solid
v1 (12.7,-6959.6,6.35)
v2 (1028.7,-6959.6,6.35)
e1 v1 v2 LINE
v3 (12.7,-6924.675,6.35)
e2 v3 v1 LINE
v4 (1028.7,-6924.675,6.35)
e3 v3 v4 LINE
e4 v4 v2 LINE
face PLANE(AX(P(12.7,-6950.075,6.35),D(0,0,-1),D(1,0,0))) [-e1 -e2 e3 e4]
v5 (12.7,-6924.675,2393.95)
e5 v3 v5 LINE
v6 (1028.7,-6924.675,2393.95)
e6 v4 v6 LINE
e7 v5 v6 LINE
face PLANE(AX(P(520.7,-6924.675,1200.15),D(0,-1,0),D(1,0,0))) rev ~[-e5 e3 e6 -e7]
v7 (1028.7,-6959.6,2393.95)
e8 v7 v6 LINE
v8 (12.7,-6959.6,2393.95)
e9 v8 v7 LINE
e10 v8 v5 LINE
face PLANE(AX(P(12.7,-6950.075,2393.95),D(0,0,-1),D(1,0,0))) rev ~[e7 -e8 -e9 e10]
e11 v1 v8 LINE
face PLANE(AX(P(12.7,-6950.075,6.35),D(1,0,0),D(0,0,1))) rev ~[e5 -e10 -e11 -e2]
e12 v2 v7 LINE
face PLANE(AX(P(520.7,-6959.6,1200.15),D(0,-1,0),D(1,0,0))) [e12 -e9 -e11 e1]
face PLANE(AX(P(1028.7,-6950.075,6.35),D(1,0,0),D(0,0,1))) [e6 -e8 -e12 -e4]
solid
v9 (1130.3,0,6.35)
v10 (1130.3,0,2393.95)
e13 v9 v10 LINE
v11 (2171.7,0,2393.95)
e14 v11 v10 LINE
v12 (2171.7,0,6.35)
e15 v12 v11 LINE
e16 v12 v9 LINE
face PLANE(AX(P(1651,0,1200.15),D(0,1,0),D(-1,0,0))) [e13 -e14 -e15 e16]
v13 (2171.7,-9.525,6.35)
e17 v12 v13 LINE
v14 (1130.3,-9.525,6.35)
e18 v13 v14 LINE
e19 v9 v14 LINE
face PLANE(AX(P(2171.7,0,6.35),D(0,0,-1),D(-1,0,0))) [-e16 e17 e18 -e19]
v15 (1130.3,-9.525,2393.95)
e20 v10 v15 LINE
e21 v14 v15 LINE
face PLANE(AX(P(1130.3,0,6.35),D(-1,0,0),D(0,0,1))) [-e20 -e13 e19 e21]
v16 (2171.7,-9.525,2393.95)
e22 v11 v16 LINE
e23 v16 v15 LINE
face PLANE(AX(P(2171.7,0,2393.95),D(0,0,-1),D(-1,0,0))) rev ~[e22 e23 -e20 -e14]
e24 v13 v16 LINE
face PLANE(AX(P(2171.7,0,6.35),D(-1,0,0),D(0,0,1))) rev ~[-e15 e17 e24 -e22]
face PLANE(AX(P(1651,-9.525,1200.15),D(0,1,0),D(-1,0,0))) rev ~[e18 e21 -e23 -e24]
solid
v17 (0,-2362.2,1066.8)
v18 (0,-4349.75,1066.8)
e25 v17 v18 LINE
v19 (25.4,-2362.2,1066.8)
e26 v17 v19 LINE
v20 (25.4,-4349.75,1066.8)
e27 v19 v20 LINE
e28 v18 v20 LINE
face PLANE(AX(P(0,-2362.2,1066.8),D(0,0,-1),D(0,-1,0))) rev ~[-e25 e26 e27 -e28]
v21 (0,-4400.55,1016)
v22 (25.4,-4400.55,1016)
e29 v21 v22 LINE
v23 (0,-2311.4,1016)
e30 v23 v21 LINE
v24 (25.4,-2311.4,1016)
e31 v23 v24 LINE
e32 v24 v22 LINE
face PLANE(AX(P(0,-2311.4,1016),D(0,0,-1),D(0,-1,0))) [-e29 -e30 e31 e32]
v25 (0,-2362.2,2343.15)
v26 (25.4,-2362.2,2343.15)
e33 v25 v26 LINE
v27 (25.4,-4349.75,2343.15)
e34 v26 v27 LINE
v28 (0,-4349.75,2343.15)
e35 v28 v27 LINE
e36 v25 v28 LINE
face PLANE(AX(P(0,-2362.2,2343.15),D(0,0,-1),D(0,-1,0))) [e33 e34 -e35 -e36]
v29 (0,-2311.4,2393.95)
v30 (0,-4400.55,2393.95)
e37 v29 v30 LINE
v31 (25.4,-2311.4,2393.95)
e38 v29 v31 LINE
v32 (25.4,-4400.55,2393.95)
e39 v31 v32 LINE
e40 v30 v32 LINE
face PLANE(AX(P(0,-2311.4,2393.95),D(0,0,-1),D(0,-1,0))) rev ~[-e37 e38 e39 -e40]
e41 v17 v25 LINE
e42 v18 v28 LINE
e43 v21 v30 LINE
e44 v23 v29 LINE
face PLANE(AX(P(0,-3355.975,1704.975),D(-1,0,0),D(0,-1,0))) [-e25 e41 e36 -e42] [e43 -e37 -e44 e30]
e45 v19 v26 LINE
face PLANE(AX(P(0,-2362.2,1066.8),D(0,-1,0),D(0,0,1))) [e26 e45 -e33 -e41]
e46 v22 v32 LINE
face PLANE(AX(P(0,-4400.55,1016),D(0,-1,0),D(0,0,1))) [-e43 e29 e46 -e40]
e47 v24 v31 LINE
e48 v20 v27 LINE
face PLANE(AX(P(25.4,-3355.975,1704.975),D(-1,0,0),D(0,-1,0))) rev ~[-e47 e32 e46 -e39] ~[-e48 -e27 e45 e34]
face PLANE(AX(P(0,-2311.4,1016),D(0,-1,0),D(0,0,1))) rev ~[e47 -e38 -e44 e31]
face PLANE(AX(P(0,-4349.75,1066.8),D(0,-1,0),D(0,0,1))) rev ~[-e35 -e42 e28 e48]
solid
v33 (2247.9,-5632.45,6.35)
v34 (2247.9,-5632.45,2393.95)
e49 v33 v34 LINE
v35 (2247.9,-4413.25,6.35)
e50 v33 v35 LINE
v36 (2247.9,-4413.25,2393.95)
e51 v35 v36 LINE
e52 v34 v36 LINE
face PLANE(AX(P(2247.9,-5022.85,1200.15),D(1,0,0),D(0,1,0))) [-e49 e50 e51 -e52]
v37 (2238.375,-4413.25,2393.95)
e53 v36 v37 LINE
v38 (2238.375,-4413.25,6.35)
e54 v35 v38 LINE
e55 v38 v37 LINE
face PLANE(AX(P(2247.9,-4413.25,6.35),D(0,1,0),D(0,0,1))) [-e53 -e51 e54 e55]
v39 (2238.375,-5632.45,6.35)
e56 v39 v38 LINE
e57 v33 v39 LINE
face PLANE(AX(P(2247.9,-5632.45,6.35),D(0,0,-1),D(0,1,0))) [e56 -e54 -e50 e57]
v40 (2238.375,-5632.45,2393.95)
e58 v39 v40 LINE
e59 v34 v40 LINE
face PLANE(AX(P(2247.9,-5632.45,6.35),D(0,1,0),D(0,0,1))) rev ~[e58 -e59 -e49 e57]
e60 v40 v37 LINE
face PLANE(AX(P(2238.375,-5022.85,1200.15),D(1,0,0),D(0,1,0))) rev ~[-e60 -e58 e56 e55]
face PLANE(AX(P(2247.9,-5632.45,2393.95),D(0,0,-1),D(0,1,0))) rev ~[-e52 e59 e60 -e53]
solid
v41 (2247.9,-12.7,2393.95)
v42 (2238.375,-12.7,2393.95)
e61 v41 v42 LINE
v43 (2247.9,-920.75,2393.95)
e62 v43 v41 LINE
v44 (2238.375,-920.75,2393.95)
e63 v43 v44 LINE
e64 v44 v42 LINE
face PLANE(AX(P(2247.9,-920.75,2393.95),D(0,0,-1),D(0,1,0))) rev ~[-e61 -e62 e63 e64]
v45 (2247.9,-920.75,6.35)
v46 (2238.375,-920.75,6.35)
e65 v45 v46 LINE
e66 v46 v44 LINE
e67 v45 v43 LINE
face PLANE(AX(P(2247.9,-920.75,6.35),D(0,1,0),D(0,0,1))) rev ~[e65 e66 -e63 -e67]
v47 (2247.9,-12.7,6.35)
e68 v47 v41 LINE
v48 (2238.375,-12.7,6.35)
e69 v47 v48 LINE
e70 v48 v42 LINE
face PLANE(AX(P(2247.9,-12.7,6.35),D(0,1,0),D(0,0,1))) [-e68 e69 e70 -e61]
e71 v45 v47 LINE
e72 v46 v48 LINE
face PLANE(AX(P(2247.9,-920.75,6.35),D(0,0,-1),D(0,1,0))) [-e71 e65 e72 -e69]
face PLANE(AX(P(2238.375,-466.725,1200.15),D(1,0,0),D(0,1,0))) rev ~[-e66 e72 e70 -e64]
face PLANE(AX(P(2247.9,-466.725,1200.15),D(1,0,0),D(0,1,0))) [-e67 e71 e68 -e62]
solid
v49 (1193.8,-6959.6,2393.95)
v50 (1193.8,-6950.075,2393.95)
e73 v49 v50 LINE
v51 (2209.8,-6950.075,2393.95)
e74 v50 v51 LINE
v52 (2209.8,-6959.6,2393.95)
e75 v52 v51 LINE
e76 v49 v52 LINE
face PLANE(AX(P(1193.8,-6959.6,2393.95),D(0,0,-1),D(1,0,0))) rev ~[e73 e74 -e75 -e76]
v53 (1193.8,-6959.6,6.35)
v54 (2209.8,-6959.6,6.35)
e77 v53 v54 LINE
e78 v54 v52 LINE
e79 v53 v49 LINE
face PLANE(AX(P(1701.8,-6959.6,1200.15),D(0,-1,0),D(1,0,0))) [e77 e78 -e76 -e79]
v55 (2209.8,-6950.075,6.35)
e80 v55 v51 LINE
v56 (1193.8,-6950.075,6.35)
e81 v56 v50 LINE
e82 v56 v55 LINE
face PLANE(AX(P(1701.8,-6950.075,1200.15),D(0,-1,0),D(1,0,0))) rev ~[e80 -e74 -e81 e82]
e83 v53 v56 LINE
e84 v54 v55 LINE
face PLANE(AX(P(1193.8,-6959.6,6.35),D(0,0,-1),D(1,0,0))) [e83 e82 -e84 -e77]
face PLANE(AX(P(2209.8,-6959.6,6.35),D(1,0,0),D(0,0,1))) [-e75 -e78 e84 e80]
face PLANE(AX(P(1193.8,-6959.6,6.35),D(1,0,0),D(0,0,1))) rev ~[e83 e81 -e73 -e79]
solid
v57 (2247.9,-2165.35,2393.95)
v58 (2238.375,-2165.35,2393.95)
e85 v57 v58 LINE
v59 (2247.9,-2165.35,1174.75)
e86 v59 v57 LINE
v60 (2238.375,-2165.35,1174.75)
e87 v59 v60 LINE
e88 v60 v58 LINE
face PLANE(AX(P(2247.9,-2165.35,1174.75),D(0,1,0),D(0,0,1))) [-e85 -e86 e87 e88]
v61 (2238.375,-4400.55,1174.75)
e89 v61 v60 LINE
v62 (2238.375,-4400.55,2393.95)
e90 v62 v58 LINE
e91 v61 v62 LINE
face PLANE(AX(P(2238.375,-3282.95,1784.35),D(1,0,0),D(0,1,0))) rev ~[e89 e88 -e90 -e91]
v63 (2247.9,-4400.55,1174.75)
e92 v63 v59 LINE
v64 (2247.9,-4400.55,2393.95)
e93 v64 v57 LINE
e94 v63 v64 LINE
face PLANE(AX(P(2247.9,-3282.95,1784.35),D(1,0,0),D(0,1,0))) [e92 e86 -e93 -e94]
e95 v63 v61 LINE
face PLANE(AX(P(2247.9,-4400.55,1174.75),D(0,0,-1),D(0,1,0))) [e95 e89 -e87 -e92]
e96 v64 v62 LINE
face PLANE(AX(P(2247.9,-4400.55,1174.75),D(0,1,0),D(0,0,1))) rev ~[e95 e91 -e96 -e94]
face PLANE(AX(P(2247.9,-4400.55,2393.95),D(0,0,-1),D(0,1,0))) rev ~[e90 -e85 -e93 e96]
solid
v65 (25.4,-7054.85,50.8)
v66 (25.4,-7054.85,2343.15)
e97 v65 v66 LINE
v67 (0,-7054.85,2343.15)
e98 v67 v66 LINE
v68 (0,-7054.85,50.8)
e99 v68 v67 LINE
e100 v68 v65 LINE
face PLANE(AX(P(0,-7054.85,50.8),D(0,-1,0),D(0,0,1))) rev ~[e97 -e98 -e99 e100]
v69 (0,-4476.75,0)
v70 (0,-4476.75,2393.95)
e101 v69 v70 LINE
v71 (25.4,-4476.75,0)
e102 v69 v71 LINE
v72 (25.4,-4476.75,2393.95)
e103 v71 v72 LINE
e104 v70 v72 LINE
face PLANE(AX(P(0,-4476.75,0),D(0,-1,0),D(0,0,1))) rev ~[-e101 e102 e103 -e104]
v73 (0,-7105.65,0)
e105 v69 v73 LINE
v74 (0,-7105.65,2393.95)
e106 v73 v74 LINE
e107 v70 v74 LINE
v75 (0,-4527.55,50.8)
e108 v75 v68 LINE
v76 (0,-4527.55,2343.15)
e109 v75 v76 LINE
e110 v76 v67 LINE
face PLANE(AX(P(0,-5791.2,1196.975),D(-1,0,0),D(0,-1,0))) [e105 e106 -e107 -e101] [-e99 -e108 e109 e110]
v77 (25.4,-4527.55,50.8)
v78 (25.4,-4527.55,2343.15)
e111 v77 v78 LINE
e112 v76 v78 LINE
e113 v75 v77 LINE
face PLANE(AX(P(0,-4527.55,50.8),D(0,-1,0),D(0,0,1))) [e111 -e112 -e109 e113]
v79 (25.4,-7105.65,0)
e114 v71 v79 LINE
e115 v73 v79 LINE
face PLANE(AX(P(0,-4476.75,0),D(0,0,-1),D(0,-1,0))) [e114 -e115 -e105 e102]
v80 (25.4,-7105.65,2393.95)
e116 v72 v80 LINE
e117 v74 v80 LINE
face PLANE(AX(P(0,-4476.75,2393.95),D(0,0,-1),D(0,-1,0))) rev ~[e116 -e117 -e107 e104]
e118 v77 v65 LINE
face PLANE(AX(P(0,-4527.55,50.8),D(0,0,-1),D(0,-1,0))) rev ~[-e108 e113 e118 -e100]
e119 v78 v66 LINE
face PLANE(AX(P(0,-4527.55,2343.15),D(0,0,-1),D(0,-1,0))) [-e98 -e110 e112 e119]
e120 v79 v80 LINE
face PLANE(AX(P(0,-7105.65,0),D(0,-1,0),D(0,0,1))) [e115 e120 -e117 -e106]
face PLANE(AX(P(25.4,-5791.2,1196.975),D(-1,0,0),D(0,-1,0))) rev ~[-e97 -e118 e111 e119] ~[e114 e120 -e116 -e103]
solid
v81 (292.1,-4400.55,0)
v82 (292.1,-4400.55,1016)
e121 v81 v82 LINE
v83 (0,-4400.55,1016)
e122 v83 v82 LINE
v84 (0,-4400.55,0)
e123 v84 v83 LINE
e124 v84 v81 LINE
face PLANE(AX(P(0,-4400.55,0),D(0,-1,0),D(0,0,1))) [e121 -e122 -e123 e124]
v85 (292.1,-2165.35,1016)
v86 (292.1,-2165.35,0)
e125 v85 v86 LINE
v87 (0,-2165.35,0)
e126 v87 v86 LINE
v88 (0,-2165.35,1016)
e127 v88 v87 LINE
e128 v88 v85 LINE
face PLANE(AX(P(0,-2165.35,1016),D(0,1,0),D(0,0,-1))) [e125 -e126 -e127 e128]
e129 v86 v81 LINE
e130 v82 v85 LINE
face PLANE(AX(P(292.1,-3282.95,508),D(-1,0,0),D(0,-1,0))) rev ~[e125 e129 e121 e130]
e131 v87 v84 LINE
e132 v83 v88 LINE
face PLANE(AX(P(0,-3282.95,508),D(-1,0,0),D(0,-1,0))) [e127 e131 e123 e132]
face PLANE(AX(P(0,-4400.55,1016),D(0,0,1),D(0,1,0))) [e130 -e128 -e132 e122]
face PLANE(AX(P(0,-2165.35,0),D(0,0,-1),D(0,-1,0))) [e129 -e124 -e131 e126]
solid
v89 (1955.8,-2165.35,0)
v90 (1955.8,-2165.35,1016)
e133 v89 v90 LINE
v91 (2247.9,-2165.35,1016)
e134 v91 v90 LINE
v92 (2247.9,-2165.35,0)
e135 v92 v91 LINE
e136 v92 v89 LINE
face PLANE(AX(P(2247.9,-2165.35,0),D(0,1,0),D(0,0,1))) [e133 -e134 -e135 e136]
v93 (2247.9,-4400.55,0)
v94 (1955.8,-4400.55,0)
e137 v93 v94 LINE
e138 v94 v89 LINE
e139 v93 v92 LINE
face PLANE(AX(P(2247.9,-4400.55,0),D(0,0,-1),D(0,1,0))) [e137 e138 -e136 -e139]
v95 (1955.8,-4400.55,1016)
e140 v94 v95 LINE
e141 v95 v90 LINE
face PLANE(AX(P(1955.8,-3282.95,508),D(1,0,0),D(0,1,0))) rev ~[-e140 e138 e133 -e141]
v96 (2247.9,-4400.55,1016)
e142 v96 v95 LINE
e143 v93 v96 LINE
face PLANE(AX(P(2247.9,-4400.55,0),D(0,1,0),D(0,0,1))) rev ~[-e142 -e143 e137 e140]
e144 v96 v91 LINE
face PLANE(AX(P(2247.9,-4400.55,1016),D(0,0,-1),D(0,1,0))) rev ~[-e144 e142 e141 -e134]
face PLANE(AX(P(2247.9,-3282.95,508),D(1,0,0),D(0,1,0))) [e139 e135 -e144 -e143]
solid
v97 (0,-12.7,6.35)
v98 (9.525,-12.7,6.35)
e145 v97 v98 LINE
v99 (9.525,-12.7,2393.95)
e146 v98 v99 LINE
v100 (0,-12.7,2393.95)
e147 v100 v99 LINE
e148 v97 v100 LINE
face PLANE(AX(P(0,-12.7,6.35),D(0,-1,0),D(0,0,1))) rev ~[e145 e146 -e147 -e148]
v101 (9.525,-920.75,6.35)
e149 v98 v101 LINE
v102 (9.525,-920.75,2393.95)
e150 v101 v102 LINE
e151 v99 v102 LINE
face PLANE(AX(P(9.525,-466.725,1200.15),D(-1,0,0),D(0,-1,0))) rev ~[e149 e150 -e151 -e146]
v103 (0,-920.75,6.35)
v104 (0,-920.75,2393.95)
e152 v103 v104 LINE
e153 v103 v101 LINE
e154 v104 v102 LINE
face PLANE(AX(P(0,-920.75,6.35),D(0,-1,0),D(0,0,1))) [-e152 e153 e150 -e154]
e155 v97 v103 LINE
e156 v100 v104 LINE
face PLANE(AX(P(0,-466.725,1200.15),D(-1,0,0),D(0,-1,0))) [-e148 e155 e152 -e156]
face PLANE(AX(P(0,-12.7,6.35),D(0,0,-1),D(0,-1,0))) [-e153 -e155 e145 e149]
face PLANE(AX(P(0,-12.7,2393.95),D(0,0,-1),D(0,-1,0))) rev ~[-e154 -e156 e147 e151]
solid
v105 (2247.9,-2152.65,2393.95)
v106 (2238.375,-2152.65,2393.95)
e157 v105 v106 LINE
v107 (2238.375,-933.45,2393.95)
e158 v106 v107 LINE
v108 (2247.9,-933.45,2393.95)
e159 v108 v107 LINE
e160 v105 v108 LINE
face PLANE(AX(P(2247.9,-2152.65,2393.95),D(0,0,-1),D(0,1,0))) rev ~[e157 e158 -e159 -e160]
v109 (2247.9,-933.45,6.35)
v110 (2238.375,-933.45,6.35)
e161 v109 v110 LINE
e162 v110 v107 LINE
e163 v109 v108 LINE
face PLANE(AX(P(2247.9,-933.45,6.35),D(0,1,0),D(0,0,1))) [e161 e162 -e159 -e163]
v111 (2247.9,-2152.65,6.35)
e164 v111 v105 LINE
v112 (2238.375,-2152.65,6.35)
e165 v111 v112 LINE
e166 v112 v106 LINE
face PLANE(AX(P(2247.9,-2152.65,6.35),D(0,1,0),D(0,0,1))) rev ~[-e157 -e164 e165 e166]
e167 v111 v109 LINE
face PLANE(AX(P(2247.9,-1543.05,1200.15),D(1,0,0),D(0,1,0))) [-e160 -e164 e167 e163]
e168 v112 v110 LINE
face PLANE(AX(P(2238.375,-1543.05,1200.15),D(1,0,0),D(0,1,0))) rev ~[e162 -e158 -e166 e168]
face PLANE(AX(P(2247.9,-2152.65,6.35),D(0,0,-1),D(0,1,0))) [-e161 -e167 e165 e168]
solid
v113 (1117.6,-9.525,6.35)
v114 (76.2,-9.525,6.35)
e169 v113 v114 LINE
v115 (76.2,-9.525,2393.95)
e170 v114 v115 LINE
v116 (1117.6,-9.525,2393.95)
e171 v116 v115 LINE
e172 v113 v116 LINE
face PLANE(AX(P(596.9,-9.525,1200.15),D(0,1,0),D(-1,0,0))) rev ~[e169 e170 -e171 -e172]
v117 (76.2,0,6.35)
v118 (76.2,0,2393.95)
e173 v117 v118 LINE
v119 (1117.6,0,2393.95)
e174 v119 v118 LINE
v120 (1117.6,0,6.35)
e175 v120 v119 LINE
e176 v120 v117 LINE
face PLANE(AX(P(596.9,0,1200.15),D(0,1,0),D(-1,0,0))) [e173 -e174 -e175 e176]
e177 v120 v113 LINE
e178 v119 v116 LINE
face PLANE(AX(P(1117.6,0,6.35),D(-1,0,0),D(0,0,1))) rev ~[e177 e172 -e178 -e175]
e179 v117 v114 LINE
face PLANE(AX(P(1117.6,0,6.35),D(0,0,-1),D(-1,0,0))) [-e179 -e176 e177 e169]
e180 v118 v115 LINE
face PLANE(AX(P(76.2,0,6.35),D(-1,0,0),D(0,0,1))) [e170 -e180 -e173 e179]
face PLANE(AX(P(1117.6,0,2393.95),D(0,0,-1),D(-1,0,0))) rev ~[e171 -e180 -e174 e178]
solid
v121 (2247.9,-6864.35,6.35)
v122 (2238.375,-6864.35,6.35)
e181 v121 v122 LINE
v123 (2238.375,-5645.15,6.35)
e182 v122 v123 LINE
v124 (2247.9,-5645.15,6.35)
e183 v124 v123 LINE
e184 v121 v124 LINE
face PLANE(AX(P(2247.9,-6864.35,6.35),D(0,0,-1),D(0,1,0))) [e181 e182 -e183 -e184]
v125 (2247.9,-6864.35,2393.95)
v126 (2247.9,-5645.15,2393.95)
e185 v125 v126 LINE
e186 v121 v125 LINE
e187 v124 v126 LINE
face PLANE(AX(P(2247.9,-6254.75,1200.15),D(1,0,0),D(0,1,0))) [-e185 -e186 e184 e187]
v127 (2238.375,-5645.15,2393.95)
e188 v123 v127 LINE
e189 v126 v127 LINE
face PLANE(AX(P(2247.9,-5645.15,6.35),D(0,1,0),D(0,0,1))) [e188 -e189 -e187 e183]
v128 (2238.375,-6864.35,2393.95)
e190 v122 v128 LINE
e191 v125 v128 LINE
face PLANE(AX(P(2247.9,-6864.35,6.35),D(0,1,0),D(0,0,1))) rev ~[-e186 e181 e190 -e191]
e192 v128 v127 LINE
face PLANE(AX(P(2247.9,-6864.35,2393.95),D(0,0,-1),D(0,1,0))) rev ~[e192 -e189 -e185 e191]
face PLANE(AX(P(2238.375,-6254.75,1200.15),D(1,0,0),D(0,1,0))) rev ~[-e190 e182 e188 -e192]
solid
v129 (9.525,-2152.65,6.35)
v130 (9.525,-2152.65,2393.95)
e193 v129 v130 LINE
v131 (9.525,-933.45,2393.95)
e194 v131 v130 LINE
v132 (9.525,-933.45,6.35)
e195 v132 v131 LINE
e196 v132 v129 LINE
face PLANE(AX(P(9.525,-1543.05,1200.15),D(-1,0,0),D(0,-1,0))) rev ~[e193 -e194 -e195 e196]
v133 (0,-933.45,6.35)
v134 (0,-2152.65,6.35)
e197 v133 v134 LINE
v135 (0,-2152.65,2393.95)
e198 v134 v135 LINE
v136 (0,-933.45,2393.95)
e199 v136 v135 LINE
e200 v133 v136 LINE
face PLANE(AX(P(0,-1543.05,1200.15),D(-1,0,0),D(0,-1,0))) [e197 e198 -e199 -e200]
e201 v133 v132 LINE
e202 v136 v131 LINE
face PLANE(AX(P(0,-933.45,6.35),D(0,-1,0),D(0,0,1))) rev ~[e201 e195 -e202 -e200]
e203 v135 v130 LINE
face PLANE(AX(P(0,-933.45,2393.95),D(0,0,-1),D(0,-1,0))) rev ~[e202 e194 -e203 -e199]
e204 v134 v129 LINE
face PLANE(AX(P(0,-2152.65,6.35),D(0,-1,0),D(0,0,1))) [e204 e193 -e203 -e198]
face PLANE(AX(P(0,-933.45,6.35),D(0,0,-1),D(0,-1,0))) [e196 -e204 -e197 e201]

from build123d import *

# Parameters (mm, degrees)
F0_W      = 2247.9
F0_H      = 6959.6
F1_DEPTH  = 2565.4
F6_W      = 1219.2
F6_H      = 2387.6
F7_DEPTH  = 9.525
F6_W_2    = 2235.2
F6_H_2    = 1219.2
F6_W_3    = 908.05
F6_H_3    = 1016
F10_DEPTH = 292.1
F8_W      = 2628.9
F8_H      = 2393.95
F12_DEPTH = 25.4
F8_W_2    = 2089.15
F8_H_2    = 1377.95
F13_DEPTH = 292.1
F8_W_3    = 1219.2
F8_H_3    = 2387.6
F14_DEPTH = 9.525
F8_W_4    = 908.05
F9_W      = 1041.4
F9_H      = 2387.6
F15_DEPTH = 9.525
F11_W     = 1016
F11_H     = 2387.6
F16_DEPTH = 9.525
F18_DEPTH = 25.4
F19_W     = 2527.3
F19_H     = 2292.35
F20_DEPTH = 127
F21_W     = 1987.55
F21_H     = 1276.35
F22_DEPTH = 127


with BuildPart() as f1:
    # F0 (on Top) → F1 (new body)
    with BuildSketch(Plane.XY):
        with Locations((1123.95, -3479.8)):
            Rectangle(F0_W, F0_H)
    extrude(amount=F1_DEPTH)


with BuildPart() as f7:
    # F6 (on offset) → F7 (new body)
    with BuildSketch(Plane.YZ.offset(2247.9)):
        with Locations((-5022.85, 1200.15)):
            Rectangle(F6_W, F6_H)
    extrude(amount=-F7_DEPTH)


with BuildPart() as f7b:
    # F6 (on offset) → F7, piece 2 (new body)
    with BuildSketch(Plane.YZ.offset(2247.9)):
        with Locations((-3282.95, 1784.35)):
            Rectangle(F6_W_2, F6_H_2)
    extrude(amount=-F7_DEPTH)


with BuildPart() as f7c:
    # F6 (on offset) → F7, piece 3 (new body)
    with BuildSketch(Plane.YZ.offset(2247.9)):
        with Locations((-1543.05, 1200.15)):
            Rectangle(F6_W, F6_H)
    extrude(amount=-F7_DEPTH)


with BuildPart() as f7d:
    # F6 (on offset) → F7, piece 4 (new body)
    with BuildSketch(Plane.YZ.offset(2247.9)):
        with Locations((-6254.75, 1200.15)):
            Rectangle(F6_W, F6_H)
    extrude(amount=-F7_DEPTH)


with BuildPart() as f7e:
    # F6 (on offset) → F7, piece 5 (new body)
    with BuildSketch(Plane.YZ.offset(2247.9)):
        with Locations((-466.725, 1200.15)):
            Rectangle(F6_W_3, F6_H)
    extrude(amount=-F7_DEPTH)


with BuildPart() as f10:
    # F6 (on offset) → F10 (new body)
    with BuildSketch(Plane.YZ.offset(2247.9)):
        with Locations((-3282.95, 508)):
            Rectangle(F6_W_2, F6_H_3)
    extrude(amount=-F10_DEPTH)


with BuildPart() as f12:
    # F8 (on offset) → F12 (new body)
    with BuildSketch(Plane(origin=(0, 0, 0), x_dir=(0, -1, 0), z_dir=(-1, 0, 0))):
        with Locations((5791.2, 1196.975)):
            Rectangle(F8_W, F8_H)
    extrude(amount=-F12_DEPTH)

    # F19 (on face) → F20 (cut)
    with BuildSketch(Plane(origin=(0, 0, 0), x_dir=(0, -1, 0), z_dir=(-1, 0, 0))):
        with Locations((5791.2, 1196.975)):
            Rectangle(F19_W, F19_H)
    extrude(amount=-F20_DEPTH, mode=Mode.SUBTRACT)


with BuildPart() as f12b:
    # F8 (on offset) → F12, piece 2 (new body)
    with BuildSketch(Plane(origin=(0, 0, 0), x_dir=(0, -1, 0), z_dir=(-1, 0, 0))):
        with Locations((3355.975, 1704.975)):
            Rectangle(F8_W_2, F8_H_2)
    extrude(amount=-F12_DEPTH)

    # F21 (on face) → F22 (cut)
    with BuildSketch(Plane(origin=(0, 0, 0), x_dir=(0, -1, 0), z_dir=(-1, 0, 0))):
        with Locations((3355.975, 1704.975)):
            Rectangle(F21_W, F21_H)
    extrude(amount=-F22_DEPTH, mode=Mode.SUBTRACT)


with BuildPart() as f13:
    # F8 (on offset) → F13 (new body)
    with BuildSketch(Plane(origin=(0, 0, 0), x_dir=(0, -1, 0), z_dir=(-1, 0, 0))):
        Polygon((4400.55, 0), (4400.55, 1016), (2311.4, 1016), (2165.35, 1016), (2165.35, 0), align=None)
    extrude(amount=-F13_DEPTH)


with BuildPart() as f14:
    # F8 (on offset) → F14 (new body)
    with BuildSketch(Plane(origin=(0, 0, 0), x_dir=(0, -1, 0), z_dir=(-1, 0, 0))):
        with Locations((1543.05, 1200.15)):
            Rectangle(F8_W_3, F8_H_3)
    extrude(amount=-F14_DEPTH)


with BuildPart() as f14b:
    # F8 (on offset) → F14, piece 2 (new body)
    with BuildSketch(Plane(origin=(0, 0, 0), x_dir=(0, -1, 0), z_dir=(-1, 0, 0))):
        with Locations((466.725, 1200.15)):
            Rectangle(F8_W_4, F8_H_3)
    extrude(amount=-F14_DEPTH)


with BuildPart() as f15:
    # F9 (on offset) → F15 (new body)
    with BuildSketch(Plane(origin=(0, 0, 0), x_dir=(-1, 0, 0), z_dir=(0, 1, 0))):
        with Locations((-596.9, 1200.15)):
            Rectangle(F9_W, F9_H)
    extrude(amount=-F15_DEPTH)


with BuildPart() as f15b:
    # F9 (on offset) → F15, piece 2 (new body)
    with BuildSketch(Plane(origin=(0, 0, 0), x_dir=(-1, 0, 0), z_dir=(0, 1, 0))):
        with Locations((-1651, 1200.15)):
            Rectangle(F9_W, F9_H)
    extrude(amount=-F15_DEPTH)


with BuildPart() as f16:
    # F11 (on offset) → F16 (new body)
    with BuildSketch(Plane.XZ.offset(6959.6)):
        with Locations((520.7, 1200.15)):
            Rectangle(F11_W, F11_H)
    extrude(amount=-F16_DEPTH)

    # F18 (add): a face of the model
    f18_faces = [f16.faces().sort_by_distance(p)[0] for p in [
        (520.7, -6950.075, 1200.15),
    ]]
    extrude(f18_faces, amount=F18_DEPTH)


with BuildPart() as f16b:
    # F11 (on offset) → F16, piece 2 (new body)
    with BuildSketch(Plane.XZ.offset(6959.6)):
        with Locations((1701.8, 1200.15)):
            Rectangle(F11_W, F11_H)
    extrude(amount=-F16_DEPTH)


solid = Compound([f7.part, f7b.part, f7c.part, f7d.part, f7e.part, f10.part, f12.part, f12b.part, f13.part, f14.part, f14b.part, f15.part, f15b.part, f16.part, f16b.part])
